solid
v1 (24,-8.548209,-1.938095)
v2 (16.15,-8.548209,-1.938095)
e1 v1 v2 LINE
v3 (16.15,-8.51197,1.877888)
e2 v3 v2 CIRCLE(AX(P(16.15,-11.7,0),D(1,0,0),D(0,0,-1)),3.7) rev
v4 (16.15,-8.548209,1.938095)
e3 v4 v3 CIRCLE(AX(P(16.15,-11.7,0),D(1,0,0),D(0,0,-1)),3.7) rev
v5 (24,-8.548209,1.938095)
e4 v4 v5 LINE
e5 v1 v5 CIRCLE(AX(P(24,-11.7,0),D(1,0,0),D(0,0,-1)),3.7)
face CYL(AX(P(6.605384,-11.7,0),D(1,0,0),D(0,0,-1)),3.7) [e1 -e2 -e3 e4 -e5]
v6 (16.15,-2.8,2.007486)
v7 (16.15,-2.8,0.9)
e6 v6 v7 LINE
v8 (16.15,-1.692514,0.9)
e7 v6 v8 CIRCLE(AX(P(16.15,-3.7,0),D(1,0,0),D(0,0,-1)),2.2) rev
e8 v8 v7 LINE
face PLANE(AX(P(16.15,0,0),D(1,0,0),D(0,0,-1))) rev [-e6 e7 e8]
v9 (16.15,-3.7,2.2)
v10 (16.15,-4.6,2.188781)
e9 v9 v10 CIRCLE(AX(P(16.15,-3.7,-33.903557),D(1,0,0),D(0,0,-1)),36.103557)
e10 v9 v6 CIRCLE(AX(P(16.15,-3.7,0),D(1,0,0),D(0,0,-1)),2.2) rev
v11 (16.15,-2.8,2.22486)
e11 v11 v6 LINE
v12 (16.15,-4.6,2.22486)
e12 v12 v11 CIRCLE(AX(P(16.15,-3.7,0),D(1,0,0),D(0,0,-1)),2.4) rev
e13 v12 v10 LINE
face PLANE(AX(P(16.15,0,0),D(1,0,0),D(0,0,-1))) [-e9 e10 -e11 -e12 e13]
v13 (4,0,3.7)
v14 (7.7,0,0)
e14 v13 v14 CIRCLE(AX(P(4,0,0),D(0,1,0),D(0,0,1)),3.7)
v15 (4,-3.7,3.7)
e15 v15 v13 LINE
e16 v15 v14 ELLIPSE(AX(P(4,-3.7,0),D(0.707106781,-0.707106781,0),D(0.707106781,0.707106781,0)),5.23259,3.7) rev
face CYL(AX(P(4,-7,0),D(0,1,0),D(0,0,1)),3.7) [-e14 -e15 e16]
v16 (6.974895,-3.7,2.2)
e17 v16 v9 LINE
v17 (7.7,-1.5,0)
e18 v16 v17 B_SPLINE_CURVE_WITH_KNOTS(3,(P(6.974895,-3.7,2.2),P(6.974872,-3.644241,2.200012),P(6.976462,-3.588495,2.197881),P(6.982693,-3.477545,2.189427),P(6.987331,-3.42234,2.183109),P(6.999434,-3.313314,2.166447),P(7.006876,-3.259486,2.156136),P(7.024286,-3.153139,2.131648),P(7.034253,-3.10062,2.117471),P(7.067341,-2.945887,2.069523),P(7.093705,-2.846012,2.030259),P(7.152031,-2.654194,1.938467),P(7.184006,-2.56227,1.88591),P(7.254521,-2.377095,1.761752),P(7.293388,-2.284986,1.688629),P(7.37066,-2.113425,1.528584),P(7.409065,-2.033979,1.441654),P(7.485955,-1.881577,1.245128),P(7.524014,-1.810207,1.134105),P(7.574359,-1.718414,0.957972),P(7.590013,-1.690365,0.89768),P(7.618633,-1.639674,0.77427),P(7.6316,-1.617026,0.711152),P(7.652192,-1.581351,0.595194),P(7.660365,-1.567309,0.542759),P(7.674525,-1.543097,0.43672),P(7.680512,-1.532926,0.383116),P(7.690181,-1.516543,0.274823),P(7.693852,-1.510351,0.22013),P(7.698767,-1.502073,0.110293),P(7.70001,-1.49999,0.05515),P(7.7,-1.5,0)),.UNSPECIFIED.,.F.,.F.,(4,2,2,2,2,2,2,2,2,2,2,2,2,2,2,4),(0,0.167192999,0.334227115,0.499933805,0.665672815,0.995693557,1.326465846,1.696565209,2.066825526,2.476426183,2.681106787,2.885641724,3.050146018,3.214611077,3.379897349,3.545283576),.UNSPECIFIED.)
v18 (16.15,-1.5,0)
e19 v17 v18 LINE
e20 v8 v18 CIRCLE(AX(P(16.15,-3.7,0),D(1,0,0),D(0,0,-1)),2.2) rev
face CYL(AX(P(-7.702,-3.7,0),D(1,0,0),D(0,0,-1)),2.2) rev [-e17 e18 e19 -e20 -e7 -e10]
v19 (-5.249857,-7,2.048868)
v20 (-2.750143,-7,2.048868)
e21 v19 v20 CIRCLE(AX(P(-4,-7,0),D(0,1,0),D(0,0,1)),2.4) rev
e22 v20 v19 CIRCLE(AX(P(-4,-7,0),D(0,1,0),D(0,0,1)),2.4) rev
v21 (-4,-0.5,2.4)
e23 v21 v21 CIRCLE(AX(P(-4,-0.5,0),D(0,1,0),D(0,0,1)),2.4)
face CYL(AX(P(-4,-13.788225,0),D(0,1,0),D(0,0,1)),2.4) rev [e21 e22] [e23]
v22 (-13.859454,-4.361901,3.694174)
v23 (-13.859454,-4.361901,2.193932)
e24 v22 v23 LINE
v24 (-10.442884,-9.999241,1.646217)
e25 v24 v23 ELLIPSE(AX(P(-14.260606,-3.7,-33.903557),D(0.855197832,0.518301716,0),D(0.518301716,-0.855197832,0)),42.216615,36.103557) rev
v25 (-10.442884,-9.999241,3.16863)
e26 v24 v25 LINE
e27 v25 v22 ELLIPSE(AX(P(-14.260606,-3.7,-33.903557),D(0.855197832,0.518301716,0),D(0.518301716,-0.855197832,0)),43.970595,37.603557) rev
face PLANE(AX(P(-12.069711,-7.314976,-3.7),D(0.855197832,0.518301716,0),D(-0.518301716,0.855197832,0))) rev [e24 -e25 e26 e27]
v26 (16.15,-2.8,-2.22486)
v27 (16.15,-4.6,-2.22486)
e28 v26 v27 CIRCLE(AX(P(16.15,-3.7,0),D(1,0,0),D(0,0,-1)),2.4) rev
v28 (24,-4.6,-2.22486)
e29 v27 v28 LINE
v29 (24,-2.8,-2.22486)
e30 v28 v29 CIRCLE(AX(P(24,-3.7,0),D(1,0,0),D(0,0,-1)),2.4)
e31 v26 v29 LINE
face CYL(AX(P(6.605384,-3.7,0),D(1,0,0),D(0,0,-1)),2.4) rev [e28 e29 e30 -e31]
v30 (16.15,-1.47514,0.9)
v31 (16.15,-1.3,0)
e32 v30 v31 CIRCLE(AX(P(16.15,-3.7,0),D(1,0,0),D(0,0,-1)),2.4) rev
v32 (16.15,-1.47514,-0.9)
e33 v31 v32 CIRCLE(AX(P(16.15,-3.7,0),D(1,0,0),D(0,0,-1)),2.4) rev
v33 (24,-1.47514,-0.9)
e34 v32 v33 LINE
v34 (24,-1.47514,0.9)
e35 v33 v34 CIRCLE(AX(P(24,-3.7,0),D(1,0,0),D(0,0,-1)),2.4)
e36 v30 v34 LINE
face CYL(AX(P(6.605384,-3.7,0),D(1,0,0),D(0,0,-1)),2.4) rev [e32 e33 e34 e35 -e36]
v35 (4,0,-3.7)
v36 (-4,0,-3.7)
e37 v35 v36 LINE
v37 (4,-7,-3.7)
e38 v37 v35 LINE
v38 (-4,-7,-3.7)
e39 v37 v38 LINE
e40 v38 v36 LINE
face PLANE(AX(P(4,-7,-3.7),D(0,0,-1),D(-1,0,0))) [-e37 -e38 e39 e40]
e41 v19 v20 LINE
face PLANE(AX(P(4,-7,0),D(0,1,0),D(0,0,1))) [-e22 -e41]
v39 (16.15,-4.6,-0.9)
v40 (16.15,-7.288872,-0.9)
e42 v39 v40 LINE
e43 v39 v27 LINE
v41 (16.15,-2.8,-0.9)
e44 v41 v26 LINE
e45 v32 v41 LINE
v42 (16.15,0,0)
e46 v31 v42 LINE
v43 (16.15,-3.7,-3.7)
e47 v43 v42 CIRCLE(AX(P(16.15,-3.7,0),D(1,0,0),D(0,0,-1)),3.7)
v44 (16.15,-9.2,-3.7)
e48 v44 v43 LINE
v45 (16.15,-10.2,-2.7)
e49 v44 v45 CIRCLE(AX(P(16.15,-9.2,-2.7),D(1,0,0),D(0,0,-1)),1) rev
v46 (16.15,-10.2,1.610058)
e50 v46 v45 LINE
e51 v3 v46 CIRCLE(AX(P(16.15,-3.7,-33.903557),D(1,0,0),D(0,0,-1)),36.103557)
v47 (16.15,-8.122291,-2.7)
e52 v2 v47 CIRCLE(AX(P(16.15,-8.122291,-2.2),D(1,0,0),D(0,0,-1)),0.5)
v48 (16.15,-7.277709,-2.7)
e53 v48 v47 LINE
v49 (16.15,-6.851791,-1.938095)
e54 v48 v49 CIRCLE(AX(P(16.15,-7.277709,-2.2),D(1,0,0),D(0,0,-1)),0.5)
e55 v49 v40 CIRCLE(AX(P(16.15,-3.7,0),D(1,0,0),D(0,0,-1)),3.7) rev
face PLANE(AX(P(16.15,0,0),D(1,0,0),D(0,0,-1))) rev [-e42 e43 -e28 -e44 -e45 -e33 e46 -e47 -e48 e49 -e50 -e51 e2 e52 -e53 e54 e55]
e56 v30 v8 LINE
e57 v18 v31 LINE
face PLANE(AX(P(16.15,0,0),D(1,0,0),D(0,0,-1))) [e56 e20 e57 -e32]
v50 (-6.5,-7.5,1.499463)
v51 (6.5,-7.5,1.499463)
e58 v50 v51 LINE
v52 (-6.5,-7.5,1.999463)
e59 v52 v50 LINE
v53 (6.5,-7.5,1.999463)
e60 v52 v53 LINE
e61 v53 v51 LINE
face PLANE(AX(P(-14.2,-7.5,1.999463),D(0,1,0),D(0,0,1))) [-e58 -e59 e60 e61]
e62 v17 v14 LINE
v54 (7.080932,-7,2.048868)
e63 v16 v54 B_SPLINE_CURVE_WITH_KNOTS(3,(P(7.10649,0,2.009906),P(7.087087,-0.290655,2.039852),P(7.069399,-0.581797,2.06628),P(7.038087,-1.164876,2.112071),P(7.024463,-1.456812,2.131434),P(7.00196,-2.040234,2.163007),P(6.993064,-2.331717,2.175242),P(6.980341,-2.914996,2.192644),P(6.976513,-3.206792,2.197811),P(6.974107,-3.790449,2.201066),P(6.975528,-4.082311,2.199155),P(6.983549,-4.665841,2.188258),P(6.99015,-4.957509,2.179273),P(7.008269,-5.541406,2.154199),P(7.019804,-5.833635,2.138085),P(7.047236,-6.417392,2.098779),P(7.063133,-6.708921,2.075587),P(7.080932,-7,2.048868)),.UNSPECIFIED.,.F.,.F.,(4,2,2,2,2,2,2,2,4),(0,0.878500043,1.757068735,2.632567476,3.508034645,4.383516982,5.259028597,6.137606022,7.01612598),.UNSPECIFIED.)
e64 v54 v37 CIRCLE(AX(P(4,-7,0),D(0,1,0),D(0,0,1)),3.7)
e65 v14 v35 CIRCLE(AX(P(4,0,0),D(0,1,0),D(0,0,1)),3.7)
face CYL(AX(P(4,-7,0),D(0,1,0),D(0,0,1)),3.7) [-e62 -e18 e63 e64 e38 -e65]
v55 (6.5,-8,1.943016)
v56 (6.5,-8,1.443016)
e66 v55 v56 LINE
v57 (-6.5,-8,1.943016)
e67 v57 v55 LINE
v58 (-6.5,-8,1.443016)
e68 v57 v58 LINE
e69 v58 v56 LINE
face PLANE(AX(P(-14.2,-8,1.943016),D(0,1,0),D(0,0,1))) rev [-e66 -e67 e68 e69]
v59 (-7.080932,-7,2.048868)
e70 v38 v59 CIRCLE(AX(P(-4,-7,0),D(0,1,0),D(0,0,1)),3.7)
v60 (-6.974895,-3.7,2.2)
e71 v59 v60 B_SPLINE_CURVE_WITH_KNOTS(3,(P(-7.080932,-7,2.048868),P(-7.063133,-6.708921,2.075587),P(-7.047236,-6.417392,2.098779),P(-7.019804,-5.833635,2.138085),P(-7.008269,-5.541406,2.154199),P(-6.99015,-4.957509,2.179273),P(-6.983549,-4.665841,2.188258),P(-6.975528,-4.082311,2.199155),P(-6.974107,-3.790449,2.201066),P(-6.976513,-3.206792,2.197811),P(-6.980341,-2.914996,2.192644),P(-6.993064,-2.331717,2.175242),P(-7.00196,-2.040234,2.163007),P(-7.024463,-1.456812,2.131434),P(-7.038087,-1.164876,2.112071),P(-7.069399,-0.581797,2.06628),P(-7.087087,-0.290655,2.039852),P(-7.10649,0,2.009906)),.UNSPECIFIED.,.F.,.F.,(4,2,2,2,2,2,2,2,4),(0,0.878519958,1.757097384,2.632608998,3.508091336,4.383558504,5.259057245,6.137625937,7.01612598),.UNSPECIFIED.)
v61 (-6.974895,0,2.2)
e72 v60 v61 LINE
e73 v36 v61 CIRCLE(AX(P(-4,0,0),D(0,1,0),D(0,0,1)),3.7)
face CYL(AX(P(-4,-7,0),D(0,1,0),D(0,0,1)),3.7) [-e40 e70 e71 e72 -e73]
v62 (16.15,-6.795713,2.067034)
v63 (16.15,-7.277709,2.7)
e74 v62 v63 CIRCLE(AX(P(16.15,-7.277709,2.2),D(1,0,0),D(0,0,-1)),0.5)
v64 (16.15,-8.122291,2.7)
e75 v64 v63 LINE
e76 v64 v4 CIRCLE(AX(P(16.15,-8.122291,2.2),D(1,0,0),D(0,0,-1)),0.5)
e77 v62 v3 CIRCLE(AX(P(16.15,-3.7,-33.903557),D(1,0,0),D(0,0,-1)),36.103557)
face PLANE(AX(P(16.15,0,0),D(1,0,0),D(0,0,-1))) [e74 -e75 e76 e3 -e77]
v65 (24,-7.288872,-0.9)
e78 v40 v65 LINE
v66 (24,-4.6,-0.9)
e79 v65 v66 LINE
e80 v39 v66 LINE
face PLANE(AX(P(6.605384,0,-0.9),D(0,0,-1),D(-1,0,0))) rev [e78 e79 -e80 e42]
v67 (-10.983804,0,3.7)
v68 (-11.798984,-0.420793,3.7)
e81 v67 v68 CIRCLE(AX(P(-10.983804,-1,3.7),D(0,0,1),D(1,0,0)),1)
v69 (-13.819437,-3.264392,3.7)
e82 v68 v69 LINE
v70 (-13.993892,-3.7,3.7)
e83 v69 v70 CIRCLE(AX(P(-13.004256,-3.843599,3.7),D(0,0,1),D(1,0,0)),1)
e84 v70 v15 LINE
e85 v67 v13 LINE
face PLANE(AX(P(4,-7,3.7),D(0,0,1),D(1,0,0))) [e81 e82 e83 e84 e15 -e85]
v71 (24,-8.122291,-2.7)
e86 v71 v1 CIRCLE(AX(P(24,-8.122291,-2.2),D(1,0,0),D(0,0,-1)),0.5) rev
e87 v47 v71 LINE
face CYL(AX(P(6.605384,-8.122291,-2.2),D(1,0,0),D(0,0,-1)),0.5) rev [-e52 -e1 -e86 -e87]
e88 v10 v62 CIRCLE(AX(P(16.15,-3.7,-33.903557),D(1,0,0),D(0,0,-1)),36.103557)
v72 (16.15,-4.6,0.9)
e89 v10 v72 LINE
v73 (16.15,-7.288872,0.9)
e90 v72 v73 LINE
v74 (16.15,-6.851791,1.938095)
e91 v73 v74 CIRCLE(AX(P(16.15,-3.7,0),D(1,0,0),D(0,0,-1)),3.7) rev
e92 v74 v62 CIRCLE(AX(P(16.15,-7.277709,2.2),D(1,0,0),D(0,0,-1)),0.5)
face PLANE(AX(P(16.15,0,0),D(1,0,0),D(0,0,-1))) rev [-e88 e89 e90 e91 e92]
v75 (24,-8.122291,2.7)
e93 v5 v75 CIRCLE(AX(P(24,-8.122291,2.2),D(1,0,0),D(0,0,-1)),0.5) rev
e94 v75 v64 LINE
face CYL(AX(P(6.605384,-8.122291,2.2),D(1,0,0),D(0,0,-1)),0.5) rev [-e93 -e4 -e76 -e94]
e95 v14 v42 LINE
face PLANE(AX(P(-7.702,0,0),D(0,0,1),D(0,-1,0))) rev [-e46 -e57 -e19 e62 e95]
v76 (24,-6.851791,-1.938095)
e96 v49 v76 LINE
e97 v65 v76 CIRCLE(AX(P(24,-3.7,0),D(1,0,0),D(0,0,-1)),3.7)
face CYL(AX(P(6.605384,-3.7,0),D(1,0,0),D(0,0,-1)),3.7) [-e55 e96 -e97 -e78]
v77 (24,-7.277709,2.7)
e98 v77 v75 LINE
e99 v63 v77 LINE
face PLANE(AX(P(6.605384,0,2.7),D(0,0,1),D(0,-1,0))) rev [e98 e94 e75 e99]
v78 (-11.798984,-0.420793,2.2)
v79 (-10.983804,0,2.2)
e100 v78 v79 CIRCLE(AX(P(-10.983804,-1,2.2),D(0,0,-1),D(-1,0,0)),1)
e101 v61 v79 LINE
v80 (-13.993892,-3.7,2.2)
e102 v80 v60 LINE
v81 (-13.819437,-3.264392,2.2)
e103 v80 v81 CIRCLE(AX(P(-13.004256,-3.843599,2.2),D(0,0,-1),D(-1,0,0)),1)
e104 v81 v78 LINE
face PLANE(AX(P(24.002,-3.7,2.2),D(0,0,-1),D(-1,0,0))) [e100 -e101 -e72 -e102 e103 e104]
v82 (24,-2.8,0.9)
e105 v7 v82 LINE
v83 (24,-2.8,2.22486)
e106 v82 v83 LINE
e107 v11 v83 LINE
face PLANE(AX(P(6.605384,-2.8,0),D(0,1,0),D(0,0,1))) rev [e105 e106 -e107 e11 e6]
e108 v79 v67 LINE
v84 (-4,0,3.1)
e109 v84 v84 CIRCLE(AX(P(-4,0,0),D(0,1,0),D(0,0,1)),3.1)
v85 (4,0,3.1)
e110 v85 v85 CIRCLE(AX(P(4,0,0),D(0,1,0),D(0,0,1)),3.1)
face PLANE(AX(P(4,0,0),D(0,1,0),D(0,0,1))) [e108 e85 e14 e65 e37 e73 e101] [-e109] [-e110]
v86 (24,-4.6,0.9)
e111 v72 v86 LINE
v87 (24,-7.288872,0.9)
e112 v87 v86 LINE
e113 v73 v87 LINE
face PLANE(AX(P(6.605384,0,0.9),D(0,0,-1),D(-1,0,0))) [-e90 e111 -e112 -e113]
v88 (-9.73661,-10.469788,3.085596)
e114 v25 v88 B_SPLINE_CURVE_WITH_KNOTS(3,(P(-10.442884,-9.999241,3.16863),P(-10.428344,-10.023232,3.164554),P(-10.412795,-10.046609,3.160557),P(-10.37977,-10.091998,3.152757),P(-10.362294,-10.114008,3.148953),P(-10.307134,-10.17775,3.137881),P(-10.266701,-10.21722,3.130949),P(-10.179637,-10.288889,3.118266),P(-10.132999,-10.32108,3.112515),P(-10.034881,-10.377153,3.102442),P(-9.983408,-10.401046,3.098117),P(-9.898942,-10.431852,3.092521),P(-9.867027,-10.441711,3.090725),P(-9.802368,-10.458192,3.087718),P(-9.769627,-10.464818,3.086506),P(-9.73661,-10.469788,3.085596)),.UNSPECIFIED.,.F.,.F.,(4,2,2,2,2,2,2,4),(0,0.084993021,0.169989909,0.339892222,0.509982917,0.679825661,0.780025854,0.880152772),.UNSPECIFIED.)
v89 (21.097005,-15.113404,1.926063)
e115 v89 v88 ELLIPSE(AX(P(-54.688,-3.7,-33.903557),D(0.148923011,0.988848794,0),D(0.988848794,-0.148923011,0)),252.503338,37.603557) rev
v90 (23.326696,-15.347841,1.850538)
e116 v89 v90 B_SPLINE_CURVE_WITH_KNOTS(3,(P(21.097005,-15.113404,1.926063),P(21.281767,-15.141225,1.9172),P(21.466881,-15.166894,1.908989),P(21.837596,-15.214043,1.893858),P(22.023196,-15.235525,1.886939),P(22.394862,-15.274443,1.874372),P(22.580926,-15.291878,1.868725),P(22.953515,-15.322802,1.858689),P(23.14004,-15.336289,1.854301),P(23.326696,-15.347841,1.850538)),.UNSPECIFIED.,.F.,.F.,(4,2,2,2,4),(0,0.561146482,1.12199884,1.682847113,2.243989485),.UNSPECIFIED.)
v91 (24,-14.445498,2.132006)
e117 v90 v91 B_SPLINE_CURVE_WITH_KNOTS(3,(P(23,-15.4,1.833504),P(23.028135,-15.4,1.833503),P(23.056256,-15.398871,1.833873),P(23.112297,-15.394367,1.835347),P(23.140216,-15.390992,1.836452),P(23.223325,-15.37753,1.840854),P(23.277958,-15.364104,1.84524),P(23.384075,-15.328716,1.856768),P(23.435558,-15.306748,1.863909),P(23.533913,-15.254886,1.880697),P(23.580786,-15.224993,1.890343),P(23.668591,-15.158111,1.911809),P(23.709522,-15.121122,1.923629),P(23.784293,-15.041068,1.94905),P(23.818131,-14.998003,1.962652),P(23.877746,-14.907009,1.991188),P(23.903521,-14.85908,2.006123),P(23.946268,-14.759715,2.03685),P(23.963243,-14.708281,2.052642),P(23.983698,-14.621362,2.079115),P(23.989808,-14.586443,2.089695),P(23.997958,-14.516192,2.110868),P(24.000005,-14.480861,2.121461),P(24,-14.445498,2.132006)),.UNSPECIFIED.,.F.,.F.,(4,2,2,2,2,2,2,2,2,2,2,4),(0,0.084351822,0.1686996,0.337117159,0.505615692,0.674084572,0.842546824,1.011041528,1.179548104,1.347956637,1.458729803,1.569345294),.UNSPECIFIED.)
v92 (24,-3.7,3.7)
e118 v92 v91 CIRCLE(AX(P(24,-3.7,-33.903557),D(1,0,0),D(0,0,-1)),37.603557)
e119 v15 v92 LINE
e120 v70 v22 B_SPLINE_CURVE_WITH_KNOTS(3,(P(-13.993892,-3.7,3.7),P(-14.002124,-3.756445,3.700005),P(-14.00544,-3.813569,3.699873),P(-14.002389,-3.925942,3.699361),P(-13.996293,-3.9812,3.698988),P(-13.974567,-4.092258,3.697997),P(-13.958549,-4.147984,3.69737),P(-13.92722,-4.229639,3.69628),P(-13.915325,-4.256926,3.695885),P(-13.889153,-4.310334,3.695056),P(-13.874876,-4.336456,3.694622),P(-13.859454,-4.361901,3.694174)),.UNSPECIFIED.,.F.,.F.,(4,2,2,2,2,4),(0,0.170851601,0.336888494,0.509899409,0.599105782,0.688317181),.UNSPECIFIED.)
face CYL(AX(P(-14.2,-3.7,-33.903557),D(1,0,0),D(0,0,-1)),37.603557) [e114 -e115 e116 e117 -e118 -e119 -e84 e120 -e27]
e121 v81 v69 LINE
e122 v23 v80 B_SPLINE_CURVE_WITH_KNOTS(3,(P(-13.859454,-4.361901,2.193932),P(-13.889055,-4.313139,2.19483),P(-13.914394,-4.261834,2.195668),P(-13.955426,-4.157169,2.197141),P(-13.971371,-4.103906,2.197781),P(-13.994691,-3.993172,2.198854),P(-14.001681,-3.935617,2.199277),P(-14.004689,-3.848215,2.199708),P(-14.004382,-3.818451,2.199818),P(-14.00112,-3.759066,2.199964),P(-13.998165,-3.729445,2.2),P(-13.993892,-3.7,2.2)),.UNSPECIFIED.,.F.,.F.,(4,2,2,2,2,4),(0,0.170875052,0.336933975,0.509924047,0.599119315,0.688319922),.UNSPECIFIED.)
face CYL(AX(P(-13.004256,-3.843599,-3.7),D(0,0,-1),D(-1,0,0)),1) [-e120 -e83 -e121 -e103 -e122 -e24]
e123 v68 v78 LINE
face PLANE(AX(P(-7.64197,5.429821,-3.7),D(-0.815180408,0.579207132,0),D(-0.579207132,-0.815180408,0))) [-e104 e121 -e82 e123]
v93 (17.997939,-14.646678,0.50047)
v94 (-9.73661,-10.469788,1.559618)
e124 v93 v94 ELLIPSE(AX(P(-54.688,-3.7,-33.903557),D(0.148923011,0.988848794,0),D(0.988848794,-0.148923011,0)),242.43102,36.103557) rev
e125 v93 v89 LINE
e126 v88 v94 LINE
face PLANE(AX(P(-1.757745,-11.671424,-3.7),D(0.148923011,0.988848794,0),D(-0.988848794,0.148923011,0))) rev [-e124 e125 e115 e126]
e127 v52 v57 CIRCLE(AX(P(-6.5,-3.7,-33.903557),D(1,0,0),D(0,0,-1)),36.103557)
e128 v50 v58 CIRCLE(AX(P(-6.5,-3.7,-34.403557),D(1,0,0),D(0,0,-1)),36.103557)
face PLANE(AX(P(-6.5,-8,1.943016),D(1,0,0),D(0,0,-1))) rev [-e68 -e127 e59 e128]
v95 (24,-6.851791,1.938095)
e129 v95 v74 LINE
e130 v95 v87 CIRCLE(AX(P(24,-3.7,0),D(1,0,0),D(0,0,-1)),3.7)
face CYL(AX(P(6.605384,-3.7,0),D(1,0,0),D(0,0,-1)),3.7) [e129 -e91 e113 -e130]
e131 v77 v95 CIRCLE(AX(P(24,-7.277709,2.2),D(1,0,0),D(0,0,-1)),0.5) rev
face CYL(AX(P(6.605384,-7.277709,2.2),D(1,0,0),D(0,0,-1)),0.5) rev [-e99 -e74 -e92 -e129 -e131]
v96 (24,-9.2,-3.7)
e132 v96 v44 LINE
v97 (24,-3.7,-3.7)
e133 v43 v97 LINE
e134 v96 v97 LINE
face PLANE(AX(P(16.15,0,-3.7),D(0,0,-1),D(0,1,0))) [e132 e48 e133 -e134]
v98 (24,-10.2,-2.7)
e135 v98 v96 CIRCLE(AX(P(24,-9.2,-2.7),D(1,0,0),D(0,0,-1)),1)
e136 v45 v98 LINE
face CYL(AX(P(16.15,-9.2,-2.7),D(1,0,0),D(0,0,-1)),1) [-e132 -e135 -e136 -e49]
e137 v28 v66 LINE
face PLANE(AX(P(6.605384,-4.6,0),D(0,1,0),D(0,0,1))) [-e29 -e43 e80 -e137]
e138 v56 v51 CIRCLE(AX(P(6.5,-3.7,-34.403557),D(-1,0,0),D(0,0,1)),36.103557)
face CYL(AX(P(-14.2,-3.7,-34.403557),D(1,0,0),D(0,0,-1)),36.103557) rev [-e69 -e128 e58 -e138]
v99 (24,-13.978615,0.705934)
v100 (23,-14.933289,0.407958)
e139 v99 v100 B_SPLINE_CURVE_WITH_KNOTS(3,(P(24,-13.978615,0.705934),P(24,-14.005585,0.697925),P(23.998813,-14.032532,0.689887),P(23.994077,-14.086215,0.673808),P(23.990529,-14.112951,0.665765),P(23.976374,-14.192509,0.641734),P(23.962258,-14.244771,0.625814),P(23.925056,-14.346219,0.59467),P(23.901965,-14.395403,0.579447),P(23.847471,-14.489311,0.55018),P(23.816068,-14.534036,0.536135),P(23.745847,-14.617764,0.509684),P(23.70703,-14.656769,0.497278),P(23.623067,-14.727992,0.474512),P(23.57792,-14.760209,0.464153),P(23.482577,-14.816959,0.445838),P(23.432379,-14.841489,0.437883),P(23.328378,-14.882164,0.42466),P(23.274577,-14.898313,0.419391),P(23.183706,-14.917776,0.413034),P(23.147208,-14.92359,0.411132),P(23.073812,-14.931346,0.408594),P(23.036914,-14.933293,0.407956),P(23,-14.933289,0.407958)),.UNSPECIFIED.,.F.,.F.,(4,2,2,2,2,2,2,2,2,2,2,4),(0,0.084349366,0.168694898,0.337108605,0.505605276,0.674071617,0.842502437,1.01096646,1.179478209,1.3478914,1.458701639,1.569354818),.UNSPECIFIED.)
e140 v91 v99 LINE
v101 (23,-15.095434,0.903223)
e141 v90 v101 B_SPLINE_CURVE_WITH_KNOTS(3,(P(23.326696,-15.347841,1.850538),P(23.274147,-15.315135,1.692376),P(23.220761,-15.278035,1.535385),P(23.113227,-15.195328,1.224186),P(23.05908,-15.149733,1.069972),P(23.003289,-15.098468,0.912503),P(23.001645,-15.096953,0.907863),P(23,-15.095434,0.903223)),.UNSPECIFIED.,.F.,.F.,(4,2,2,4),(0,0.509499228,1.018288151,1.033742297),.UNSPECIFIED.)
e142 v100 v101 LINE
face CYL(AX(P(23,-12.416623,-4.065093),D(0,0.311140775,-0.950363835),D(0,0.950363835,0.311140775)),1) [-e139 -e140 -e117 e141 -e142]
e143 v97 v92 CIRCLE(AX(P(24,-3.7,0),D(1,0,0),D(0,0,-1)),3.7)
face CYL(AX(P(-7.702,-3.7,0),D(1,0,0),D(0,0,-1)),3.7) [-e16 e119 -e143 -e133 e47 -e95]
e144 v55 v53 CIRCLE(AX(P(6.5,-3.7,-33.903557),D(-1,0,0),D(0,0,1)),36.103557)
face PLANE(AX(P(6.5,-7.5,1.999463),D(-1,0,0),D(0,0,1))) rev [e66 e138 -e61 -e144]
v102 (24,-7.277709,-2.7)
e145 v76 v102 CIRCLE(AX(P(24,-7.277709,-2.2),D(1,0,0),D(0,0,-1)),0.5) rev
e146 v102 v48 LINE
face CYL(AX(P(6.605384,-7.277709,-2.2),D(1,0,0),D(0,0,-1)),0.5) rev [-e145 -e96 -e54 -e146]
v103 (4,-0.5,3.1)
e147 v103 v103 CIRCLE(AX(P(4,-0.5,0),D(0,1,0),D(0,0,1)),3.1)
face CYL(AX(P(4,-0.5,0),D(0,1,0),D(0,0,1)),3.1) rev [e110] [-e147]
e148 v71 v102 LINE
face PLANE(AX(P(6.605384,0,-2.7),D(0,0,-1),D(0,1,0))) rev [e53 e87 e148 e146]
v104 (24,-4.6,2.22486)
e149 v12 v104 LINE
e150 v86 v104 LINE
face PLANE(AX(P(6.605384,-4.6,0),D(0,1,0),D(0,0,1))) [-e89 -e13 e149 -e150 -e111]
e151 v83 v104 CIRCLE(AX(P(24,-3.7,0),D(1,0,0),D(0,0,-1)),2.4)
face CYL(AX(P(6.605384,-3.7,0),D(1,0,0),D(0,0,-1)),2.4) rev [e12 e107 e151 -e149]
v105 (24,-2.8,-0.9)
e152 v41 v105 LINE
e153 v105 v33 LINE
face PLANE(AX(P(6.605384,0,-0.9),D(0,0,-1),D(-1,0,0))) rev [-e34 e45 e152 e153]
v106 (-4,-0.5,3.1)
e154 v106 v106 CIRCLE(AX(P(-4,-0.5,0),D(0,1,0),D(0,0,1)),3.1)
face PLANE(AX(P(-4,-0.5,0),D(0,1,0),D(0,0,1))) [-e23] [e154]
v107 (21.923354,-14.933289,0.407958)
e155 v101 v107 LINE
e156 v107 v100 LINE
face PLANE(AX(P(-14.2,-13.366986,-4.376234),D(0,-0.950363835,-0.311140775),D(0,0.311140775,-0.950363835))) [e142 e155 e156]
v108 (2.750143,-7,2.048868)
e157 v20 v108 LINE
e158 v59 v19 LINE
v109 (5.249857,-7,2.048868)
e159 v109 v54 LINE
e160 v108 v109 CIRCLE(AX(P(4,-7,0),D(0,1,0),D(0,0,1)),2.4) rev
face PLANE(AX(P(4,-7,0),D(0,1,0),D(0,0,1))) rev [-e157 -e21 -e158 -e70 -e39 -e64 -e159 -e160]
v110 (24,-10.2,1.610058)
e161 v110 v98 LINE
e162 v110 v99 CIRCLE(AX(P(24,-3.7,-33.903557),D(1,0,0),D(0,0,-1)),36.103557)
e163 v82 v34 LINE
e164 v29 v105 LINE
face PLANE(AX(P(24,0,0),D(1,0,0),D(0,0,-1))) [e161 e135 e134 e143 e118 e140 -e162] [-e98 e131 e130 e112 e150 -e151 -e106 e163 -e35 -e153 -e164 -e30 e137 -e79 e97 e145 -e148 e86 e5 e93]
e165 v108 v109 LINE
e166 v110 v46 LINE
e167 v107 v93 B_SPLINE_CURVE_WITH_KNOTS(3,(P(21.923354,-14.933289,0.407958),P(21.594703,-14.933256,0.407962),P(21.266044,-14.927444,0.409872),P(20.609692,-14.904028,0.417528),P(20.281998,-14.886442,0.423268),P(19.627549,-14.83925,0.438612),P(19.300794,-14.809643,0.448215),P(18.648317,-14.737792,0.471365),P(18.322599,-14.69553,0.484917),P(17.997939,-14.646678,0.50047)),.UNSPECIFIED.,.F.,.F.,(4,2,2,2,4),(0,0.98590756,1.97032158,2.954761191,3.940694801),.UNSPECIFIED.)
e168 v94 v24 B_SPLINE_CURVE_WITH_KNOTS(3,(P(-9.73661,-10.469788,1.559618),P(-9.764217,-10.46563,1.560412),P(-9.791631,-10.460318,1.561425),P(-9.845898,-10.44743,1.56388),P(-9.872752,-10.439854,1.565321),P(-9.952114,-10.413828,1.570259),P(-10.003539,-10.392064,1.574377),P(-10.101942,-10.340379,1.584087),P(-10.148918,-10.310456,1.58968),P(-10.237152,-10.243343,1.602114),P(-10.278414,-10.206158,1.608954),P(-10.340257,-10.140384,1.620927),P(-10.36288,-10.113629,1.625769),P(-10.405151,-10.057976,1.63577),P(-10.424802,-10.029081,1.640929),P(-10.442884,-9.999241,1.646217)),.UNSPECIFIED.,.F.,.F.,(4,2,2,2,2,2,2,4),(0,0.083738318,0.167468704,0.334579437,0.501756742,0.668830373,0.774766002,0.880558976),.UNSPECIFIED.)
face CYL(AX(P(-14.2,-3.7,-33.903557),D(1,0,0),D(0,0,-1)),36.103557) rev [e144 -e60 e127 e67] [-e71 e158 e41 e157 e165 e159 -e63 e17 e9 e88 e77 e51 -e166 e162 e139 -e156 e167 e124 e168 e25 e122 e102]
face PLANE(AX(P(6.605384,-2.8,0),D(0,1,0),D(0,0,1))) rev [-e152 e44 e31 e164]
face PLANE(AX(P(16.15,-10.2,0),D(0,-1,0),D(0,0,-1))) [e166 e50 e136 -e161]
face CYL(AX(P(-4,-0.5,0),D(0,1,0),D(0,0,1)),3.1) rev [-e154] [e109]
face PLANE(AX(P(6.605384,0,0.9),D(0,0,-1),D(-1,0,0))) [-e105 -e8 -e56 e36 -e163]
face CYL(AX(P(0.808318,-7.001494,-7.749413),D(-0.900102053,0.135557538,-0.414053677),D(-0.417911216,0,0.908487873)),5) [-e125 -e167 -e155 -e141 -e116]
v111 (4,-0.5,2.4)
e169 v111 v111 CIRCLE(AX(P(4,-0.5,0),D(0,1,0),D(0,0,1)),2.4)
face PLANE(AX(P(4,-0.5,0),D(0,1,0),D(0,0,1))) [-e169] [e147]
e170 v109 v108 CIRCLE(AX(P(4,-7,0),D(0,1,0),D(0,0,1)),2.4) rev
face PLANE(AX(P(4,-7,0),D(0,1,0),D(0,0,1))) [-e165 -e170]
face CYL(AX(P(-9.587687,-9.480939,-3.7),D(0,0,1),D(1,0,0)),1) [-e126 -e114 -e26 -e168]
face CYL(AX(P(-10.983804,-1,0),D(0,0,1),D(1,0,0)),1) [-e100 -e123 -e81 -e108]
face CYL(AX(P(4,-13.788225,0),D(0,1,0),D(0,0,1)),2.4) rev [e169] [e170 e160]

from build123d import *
from build123d.topology import SkipClean

# Parameters (mm, degrees)
F_2_BLOCK_BODY_DEPTH        = 7
AXLE_START                  = 24
SKETCH2_R                   = 3.7
AXLE_BODY_DEPTH             = 7.85
FAIRING_TOP_REACH           = 35.506
FAIRING_TOP_END_RADIUS      = 3.7
FAIRING_BOTTOM_DEPTH        = 38.2
FAIRING_SIDE_CUT_DEPTH      = 29.754999715
FAIRING_SIDE_CUT_DEPTH_BACK = 29.754999715
FAIRING_CORNER_REACH        = 43.353
FAIRING_CORNER_END_RADIUS   = 3.7
SKETCH6_W                   = 1.5
SKETCH6_H                   = 3.7
SKETCH3_W                   = 1.8
SKETCH3_H                   = 1.8
AXLE_CUT_DEPTH              = 7.85
FILLET1_R                   = 0.5
SKETCH7_R                   = 2.4
BLOCK_HOLES_DEPTH           = 7
SKETCH8_R                   = 3.1
SKETCH8_R_2                 = 2.4
RIM_CUTS_DEPTH              = 0.5
STOPPER_REACH               = 31.255
STOPPER_START_RADIUS        = 36.103557437
STOPPER_END_RADIUS          = 36.103557437
SKETCH9_W                   = 13
SKETCH9_H                   = 0.5
FILLET2_R                   = 1
FAIRING_MAIN_CUT_DEPTH      = 29.754999715
FAIRING_MAIN_CUT_DEPTH_BACK = 29.754999715
FILLET3_R                   = 5
FILLET4_R                   = 1


with BuildPart() as part:
    # Sketch1 → 2 Block Body (new body)
    with BuildSketch(Plane(origin=(0, 0, 0), x_dir=(1, 0, 0), z_dir=(0, 1, 0))):
        with BuildLine():
            Line((4, -3.7), (-4, -3.7))
            ThreePointArc((-4, -3.7), (-7.7, 0), (-4, 3.7))
            Line((-4, 3.7), (4, 3.7))
            ThreePointArc((4, 3.7), (7.7, 0), (4, -3.7))
        make_face()
    extrude(amount=-F_2_BLOCK_BODY_DEPTH)



with BuildPart() as body_2:
    # Sketch2 → Axle Body (new body)
    with BuildSketch(Plane(origin=(0, 0, 0), x_dir=(0, 0, -1), z_dir=(1, 0, 0)).offset(AXLE_START)):
        with BuildLine():
            ThreePointArc((3.7, -3.7), (0, -7.4), (-3.7, -3.7))
            Line((-3.7, -3.7), (-3.7, -10.2))
            Line((-3.7, -10.2), (3.7, -10.2))
            Line((3.7, -10.2), (3.7, -3.7))
        make_face()
        with Locations((0, -3.7)):
            Circle(SKETCH2_R)
    extrude(amount=-AXLE_BODY_DEPTH)


with BuildPart() as part_1:
    add(part.part)

    add(body_2.part)  # Fairing Top merges body 2
    # Fairing Top: up to this cylinder (the profile starts outside it)
    fairing_top_end = Plane(origin=(4, -1.781509, 0), z_dir=(0, 1, 0)) * Cylinder(FAIRING_TOP_END_RADIUS, 79.412, mode=Mode.PRIVATE)
    # Sketch4 → Fairing Top (add, up to the surface)
    with BuildSketch(Plane(origin=(24, 0, 0), x_dir=(0, 0, -1), z_dir=(1, 0, 0)), mode=Mode.PRIVATE) as fairing_top_sk1:
        with BuildLine():
            Line((0, -1.5), (0, 0))
            ThreePointArc((0, 0), (-2.61629509, -1.08370491), (-3.7, -3.7))
            Line((-3.7, -3.7), (-2.2, -3.7))
            ThreePointArc((-2.2, -3.7), (-1.555634919, -2.144365081), (0, -1.5))
        make_face()
    fairing_top_tool1 = extrude(fairing_top_sk1.sketch, amount=-FAIRING_TOP_REACH, mode=Mode.PRIVATE) - fairing_top_end
    add(fairing_top_tool1.solids().sort_by_distance((24, -1.781509, 1.918491))[0])

    # Sketch4<3> → Fairing Bottom (add)
    with BuildSketch(Plane(origin=(24, 0, 0), x_dir=(0, 0, -1), z_dir=(1, 0, 0))):
        with BuildLine():
            Line((-1.610057693, -10.2), (-3.133957759, -10.2))
            ThreePointArc((-3.133957759, -10.2), (-2.576502002, -12.823200932), (-1.833503605, -15.4))
            Line((-1.833503605, -15.4), (-0.407957853, -14.933288838))
            ThreePointArc((-0.407957853, -14.933288838), (-1.08913059, -12.586992982), (-1.610057693, -10.2))
        make_face()
        with BuildLine():
            Line((-2.2, -3.7), (-3.7, -3.7))
            ThreePointArc((-3.7, -3.7), (-3.558222165, -6.962299949), (-3.133957759, -10.2))
            Line((-3.133957759, -10.2), (-1.610057693, -10.2))
            ThreePointArc((-1.610057693, -10.2), (-2.052211942, -6.96335839), (-2.2, -3.7))
        make_face()
    extrude(amount=-FAIRING_BOTTOM_DEPTH)

    # Sketch5 → Fairing Side Cut (cut, two sides: drawn at the far end of the back side and taken through both)
    with SkipClean():  # the faces are left unmerged after this step: merging them gives an invalid solid
        with BuildSketch(Plane(origin=(0, 0, 0), x_dir=(0, 0, -1), z_dir=(1, 0, 0)).offset(-FAIRING_SIDE_CUT_DEPTH_BACK)):
            with BuildLine():
                Line((-1.833503605, -15.4), (-3.7, -15.4))
                Line((-3.7, -15.4), (-3.7, -3.7))
                ThreePointArc((-3.7, -3.7), (-3.230444229, -9.62397267), (-1.833503605, -15.4))
            make_face()
        extrude(amount=FAIRING_SIDE_CUT_DEPTH + FAIRING_SIDE_CUT_DEPTH_BACK, mode=Mode.SUBTRACT)

    # Fairing Corner: up to this cylinder (the profile starts outside it)
    fairing_corner_end = Plane(origin=(-4, -1.85, 0), z_dir=(0, 1, 0)) * Cylinder(FAIRING_CORNER_END_RADIUS, 95.106, mode=Mode.PRIVATE)
    # Sketch6 → Fairing Corner (add, up to the surface)
    with BuildSketch(Plane.ZY.offset(14.2), mode=Mode.PRIVATE) as fairing_corner_sk1:
        with Locations((2.95, -1.85)):
            Rectangle(SKETCH6_W, SKETCH6_H)
    fairing_corner_tool1 = extrude(fairing_corner_sk1.sketch, amount=-FAIRING_CORNER_REACH, mode=Mode.PRIVATE) - fairing_corner_end
    add(fairing_corner_tool1.solids().sort_by_distance((-14.2, -1.85, 2.95))[0])

    # Sketch3 → Axle Cut (cut)
    with BuildSketch(Plane(origin=(24, 0, 0), x_dir=(0, 0, -1), z_dir=(1, 0, 0))):
        with BuildLine():
            Line((-2.224859546, -4.6), (-0.9, -4.6))
            Line((-0.9, -4.6), (-0.9, -2.8))
            Line((-0.9, -2.8), (-2.224859546, -2.8))
            ThreePointArc((-2.224859546, -2.8), (-2.355808026, -3.24155857), (-2.4, -3.7))
            ThreePointArc((-2.4, -3.7), (-2.355808026, -4.15844143), (-2.224859546, -4.6))
        make_face()
        with BuildLine():
            Line((-0.9, -2.8), (0.9, -2.8))
            Line((0.9, -2.8), (0.9, -1.475140454))
            ThreePointArc((0.9, -1.475140454), (0.45844143, -1.344191974), (0, -1.3))
            ThreePointArc((0, -1.3), (-0.45844143, -1.344191974), (-0.9, -1.475140454))
            Line((-0.9, -1.475140454), (-0.9, -2.8))
        make_face()
        with Locations((0, -3.7)):
            Rectangle(SKETCH3_W, SKETCH3_H)
        with BuildLine():
            Line((0.9, -5.924859546), (0.9, -4.6))
            Line((0.9, -4.6), (-0.9, -4.6))
            Line((-0.9, -4.6), (-0.9, -5.924859546))
            ThreePointArc((-0.9, -5.924859546), (-0.45844143, -6.055808026), (0, -6.1))
            ThreePointArc((0, -6.1), (0.45844143, -6.055808026), (0.9, -5.924859546))
        make_face()
        with BuildLine():
            Line((0.9, -4.6), (2.224859546, -4.6))
            ThreePointArc((2.224859546, -4.6), (2.355808026, -4.15844143), (2.4, -3.7))
            ThreePointArc((2.4, -3.7), (2.355808026, -3.24155857), (2.224859546, -2.8))
            Line((2.224859546, -2.8), (0.9, -2.8))
            Line((0.9, -2.8), (0.9, -4.6))
        make_face()
        with BuildLine():
            Line((0.9, -7.288871689), (0.9, -6.1))
            Line((0.9, -6.1), (0, -6.1))
            Line((0, -6.1), (-0.9, -6.1))
            Line((-0.9, -6.1), (-0.9, -7.288871689))
            ThreePointArc((-0.9, -7.288871689), (0, -7.4), (0.9, -7.288871689))
        make_face()
        with BuildLine():
            Line((-0.9, -6.1), (0, -6.1))
            ThreePointArc((0, -6.1), (-0.45844143, -6.055808026), (-0.9, -5.924859546))
            Line((-0.9, -5.924859546), (-0.9, -6.1))
        make_face()
        with BuildLine():
            Line((0.9, -6.1), (0.9, -5.924859546))
            ThreePointArc((0.9, -5.924859546), (0.45844143, -6.055808026), (0, -6.1))
            Line((0, -6.1), (0.9, -6.1))
        make_face()
        with BuildLine():
            ThreePointArc((2.7, -6.229822128), (1.876271967, -6.888981578), (0.9, -7.288871689))
            ThreePointArc((0.9, -7.288871689), (0, -7.4), (-0.9, -7.288871689))
            ThreePointArc((-0.9, -7.288871689), (-1.876271967, -6.888981578), (-2.7, -6.229822128))
            Line((-2.7, -6.229822128), (-2.7, -9.170177872))
            ThreePointArc((-2.7, -9.170177872), (0, -8), (2.7, -9.170177872))
            Line((2.7, -9.170177872), (2.7, -6.229822128))
        make_face()
    extrude(amount=-AXLE_CUT_DEPTH, mode=Mode.SUBTRACT)

    # Fillet1
    # the kernel refuses this fillet: 0.5 mm, written as the material it adds along each edge
    with BuildSketch(Plane(origin=(24, -6.229822128, -2.7), x_dir=(0, -1, 0), z_dir=(-1, 0, 0))) as fillet1_piece_1:
        with BuildLine():
            CenterArc((1.047886636, 0.5), FILLET1_R, 148.411864495, 121.588135505)
            ThreePointArc((0.621968926, 0.761904762), (0.336413522, 0.36019377), (0, 0))
            Line((0, 0), (1.047886636, 0))
        make_face()
    extrude(amount=7.85)
    with BuildSketch(Plane(origin=(24, -9.170177872, -2.7), x_dir=(0, 0.6323800622573651, 0.7746582839287082), z_dir=(-1, 0, 0)), Plane(origin=(24, -6.229822128, 2.7), x_dir=(0, -0.6323800622573447, -0.7746582839287249), z_dir=(-1, 0, 0))) as fillet1_piece_2:
        with BuildLine():
            CenterArc((1.049991758, 0.495564032), FILLET1_R, 140.774061683, 121.588135505)
            Line((0.662662616, 0.811754063), (0, 0))
            ThreePointArc((0, 0), (0.491768292, 0.032826163), (0.983536583, 0))
        make_face()
    extrude(amount=7.85)
    with BuildSketch(Plane(origin=(24, -9.170177872, 2.7), x_dir=(0, 1, 0), z_dir=(-1, 0, 0))) as fillet1_piece_3:
        with BuildLine():
            CenterArc((1.047886636, 0.5), FILLET1_R, 148.411864495, 121.588135505)
            ThreePointArc((0.621968926, 0.761904762), (0.336413522, 0.36019377), (0, 0))
            Line((0, 0), (1.047886636, 0))
        make_face()
    extrude(amount=10.46971659)

    # Sketch7 → Block Holes (cut)
    with BuildSketch(Plane(origin=(0, 0, 0), x_dir=(1, 0, 0), z_dir=(0, 1, 0))):
        with Locations(Location((-4, 0, 0), (0, 0, 270))):
            Circle(SKETCH7_R)
        with Locations(Location((4, 0, 0), (0, 0, 270))):
            Circle(SKETCH7_R)
    extrude(amount=-BLOCK_HOLES_DEPTH, mode=Mode.SUBTRACT)

    # Sketch8 → Rim Cuts (cut)
    # profile 1 of 2: a face of its own
    with BuildSketch(Plane(origin=(0, 0, 0), x_dir=(1, 0, 0), z_dir=(0, 1, 0))):
        with Locations(Location((-4, 0, 0), (0, 0, 270))):
            Circle(SKETCH8_R)
        with Locations(Location((-4, 0, 0), (0, 0, 270))):
            Circle(SKETCH8_R_2, mode=Mode.SUBTRACT)
    # profile 2 of 2: a face of its own
    with BuildSketch(Plane(origin=(0, 0, 0), x_dir=(1, 0, 0), z_dir=(0, 1, 0))):
        with Locations(Location((4, 0, 0), (0, 0, 270))):
            Circle(SKETCH8_R)
        with Locations(Location((4, 0, 0), (0, 0, 270))):
            Circle(SKETCH8_R_2, mode=Mode.SUBTRACT)
    extrude(amount=-RIM_CUTS_DEPTH, mode=Mode.SUBTRACT)

    # Stopper: from a cylinder face, 31.255 long prism both ways, kept between that surface and its translate by the depth
    stopper_start = Plane(origin=(0, -3.7, -33.903557437), z_dir=(1, 0, 0)) * Cylinder(STOPPER_START_RADIUS, 135.717114875, mode=Mode.PRIVATE)
    stopper_end = Plane(origin=(0, -3.7, -34.403557437), z_dir=(1, 0, 0)) * Cylinder(STOPPER_END_RADIUS, 135.717114875, mode=Mode.PRIVATE)
    # Sketch9 → Stopper (add, from a surface)
    with BuildSketch(Plane.XY, mode=Mode.PRIVATE) as stopper_sk1:
        with Locations((0, -7.75)):
            Rectangle(SKETCH9_W, SKETCH9_H)
    stopper_tool1 = extrude(stopper_sk1.sketch, amount=STOPPER_REACH, both=True, mode=Mode.PRIVATE)
    add(((stopper_tool1 & stopper_start) - stopper_end).solids().sort_by_distance((0, -7.75, 1.72124))[0])

    # Fillet2
    fillet2_edges = [part_1.edges().sort_by_distance(p)[0] for p in [
        (24, -15.166644419, 1.120730729),
    ]]
    fillet(fillet2_edges, radius=FILLET2_R)

    # Sketch10 → Fairing Main Cut (cut, two sides: drawn at the far end of the back side and taken through both)
    with BuildSketch(Plane.XY.offset(-FAIRING_MAIN_CUT_DEPTH_BACK)):
        Polygon((-14.2, -3.8), (-14.2, 0), (-11.5, 0), align=None)
        Polygon((23, -15.4), (-10.2, -10.4), (-14.2, -3.8), (-14.2, -15.4), align=None)
    extrude(amount=FAIRING_MAIN_CUT_DEPTH + FAIRING_MAIN_CUT_DEPTH_BACK, mode=Mode.SUBTRACT)

    # Fillet3
    # the kernel refuses this fillet: 5 mm, written as the material it takes off along each edge
    with BuildSketch(Plane(origin=(24.982656407, -15.698592832, 2.745540381), x_dir=(-0.40943647865659716, 0.061662120279605645, 0.9102524665541475), z_dir=(-0.900102053497931, 0.1355575381773993, -0.41405367663153375))) as fillet3_piece_1:
        with BuildLine():
            CenterArc((FILLET3_R * 0.17621614345, FILLET3_R), FILLET3_R, 250.012318265, 19.987681735)
            Line((-FILLET3_R * 0.165601963428, FILLET3_R * 0.0602338685556), (-FILLET3_R * 0.172438325566, FILLET3_R * 0.0414385459267))
            Line((-FILLET3_R * 0.172438325566, FILLET3_R * 0.0414385459267), (-FILLET3_R * 0.003524322869, -FILLET3_R * 0.02))
            Line((-FILLET3_R * 0.003524322869, -FILLET3_R * 0.02), (FILLET3_R * 0.17621614345, -FILLET3_R * 0.02))
            Line((FILLET3_R * 0.17621614345, -FILLET3_R * 0.02), (FILLET3_R * 0.17621614345, 0))
        make_face()
    extrude(amount=7.848304428, mode=Mode.SUBTRACT)

    # Fillet4
    fillet4_edges = [part_1.edges().sort_by_distance(p)[0] for p in [
        (-11.5, 0, 2.95),
        (-10.2, -10.4, 2.335585217),
        (-14.2, -3.8, 2.949864271),
        (20.075, -10.2, -3.7),
    ]]
    fillet(fillet4_edges, radius=FILLET4_R)


solid = part_1.part
